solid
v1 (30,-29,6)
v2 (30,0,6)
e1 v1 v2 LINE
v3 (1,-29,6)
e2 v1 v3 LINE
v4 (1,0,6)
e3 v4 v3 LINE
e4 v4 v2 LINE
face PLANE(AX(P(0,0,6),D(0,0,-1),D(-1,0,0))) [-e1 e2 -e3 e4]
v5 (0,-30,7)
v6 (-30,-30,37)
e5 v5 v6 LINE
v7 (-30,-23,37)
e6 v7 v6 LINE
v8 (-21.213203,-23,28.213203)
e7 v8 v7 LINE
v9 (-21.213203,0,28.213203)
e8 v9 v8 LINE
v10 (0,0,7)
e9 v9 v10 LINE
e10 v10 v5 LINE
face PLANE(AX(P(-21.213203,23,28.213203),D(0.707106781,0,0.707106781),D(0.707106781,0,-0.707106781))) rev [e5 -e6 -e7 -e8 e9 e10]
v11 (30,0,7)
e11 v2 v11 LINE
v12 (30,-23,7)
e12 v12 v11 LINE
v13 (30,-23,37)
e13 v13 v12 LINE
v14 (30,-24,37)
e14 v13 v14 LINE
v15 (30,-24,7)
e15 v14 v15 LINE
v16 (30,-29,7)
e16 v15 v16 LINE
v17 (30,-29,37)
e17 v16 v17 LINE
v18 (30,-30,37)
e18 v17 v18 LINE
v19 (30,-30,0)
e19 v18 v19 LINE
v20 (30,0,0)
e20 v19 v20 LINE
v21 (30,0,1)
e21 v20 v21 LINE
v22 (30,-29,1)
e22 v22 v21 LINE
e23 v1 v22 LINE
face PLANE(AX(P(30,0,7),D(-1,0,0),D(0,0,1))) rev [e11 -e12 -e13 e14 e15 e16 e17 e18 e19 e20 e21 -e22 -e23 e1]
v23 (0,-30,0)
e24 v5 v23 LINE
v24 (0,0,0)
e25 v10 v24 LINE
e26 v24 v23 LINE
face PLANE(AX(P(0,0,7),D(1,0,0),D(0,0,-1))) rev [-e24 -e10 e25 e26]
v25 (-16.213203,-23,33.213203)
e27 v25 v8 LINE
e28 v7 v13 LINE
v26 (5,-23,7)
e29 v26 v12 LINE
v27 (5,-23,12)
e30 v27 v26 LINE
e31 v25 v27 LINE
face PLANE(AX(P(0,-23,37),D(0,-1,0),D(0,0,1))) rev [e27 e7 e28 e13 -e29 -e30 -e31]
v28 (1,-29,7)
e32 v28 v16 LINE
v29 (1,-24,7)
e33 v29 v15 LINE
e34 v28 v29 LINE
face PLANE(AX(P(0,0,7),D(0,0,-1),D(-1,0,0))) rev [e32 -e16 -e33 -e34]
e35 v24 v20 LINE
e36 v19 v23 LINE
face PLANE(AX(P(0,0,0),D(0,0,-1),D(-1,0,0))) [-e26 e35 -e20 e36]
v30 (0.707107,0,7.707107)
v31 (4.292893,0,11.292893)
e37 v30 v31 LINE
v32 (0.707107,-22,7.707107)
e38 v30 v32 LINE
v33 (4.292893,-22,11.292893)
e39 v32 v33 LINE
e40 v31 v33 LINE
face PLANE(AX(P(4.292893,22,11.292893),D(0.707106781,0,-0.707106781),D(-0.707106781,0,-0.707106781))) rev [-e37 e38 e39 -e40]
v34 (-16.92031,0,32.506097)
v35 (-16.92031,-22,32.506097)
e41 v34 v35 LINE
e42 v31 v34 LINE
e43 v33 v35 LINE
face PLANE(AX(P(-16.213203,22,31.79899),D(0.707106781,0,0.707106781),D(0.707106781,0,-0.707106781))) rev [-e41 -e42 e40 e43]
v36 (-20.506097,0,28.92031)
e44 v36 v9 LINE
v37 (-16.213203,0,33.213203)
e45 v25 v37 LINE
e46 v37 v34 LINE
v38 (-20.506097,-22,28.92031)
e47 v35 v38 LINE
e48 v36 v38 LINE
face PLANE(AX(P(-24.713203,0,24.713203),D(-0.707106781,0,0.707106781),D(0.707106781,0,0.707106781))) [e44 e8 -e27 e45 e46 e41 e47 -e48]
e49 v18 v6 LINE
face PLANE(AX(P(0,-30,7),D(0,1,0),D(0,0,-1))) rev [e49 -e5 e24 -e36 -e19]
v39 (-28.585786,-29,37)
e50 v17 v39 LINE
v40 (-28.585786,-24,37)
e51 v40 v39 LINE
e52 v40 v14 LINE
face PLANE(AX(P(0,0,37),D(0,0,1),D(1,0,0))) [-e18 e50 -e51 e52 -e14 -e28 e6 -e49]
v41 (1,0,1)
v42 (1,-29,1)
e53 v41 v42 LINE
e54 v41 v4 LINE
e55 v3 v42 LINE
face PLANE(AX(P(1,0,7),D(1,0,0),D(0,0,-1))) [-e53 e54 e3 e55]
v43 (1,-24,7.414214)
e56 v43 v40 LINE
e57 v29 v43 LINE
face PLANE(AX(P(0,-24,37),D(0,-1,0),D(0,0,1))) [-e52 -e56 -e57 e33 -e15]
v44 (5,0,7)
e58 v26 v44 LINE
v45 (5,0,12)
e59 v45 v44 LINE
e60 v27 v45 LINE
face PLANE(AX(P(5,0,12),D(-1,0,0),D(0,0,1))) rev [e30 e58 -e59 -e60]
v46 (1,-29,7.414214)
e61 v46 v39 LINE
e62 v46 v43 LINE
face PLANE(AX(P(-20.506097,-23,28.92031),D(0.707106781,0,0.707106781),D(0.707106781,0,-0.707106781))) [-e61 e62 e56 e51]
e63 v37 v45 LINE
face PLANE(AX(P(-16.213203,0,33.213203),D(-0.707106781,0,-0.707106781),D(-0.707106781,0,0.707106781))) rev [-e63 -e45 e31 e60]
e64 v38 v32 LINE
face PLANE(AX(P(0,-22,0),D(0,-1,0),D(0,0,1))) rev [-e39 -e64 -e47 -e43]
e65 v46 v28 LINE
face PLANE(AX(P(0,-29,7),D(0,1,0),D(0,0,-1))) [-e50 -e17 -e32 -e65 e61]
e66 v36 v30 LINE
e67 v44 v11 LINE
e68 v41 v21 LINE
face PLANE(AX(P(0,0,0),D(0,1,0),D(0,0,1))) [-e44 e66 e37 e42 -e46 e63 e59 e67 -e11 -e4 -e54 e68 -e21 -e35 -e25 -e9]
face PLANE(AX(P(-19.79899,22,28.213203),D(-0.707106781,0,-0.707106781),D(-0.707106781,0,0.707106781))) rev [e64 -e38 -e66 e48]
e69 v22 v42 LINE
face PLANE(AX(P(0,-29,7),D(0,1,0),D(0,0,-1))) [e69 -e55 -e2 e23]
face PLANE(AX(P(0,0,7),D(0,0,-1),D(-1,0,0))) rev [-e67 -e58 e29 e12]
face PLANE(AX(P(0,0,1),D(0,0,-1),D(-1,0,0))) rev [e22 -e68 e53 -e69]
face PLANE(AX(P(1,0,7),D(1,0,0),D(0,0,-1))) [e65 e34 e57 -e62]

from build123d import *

# Parameters (mm, degrees)
SKETCH1_W           = 30
SKETCH1_H           = 30
BOSS_EXTRUDE1_DEPTH = 7
SHELL1_T            = -1
SKETCH2_W           = 30
SKETCH2_H           = 7
BOSS_EXTRUDE2_DEPTH = 30
SKETCH3_W           = 30
SKETCH3_H           = 7
BOSS_EXTRUDE3_DEPTH = 30
SKETCH5_W           = 5
SKETCH5_H           = 23
BOSS_EXTRUDE4_DEPTH = 5
CUT_EXTRUDE6_DEPTH  = 23
SKETCH12_W          = 7.071067812
SKETCH12_H          = 23
BOSS_EXTRUDE6_DEPTH = 30
CUT_EXTRUDE7_DEPTH  = 22
CUT_EXTRUDE8_DEPTH  = 22
SHELL2_START        = 24
SHELL2_DEPTH        = 5
SHELL2_START_2      = 23
SHELL2_2_DEPTH      = 1
SHELL2_START_3      = 1
SHELL2_3_DEPTH      = 22
BOSS_EXTRUDE7_DEPTH = 1
BOSS_EXTRUDE8_DEPTH = 23
CUT_EXTRUDE10_DEPTH = 1
CUT_EXTRUDE12_START = -30
CUT_EXTRUDE12_DEPTH = 50


# Read off the part's stored shape, not the designer's step: Shell2
with BuildPart() as part:
    # Sketch1 → Boss-Extrude1 (new body)
    with BuildSketch(Plane.XY):
        with Locations((15, 15)):
            Rectangle(SKETCH1_W, SKETCH1_H)
    extrude(amount=BOSS_EXTRUDE1_DEPTH)

    # Shell1
    shell1_openings = [part.faces().sort_by_distance(p)[0] for p in [
        (30, 15, 3.5),
        (15, 0, 3.5),
    ]]
    offset(amount=SHELL1_T, openings=shell1_openings, kind=Kind.INTERSECTION)

    # Sketch2 → Boss-Extrude2 (add)
    with BuildSketch(Plane.XY.offset(7)):
        with Locations((15, 26.5)):
            Rectangle(SKETCH2_W, SKETCH2_H)
    extrude(amount=BOSS_EXTRUDE2_DEPTH)

    # Sketch3 → Boss-Extrude3 (add)
    with BuildSketch(Plane.ZY):
        with Locations((22, 26.5)):
            Rectangle(SKETCH3_W, SKETCH3_H)
    extrude(amount=BOSS_EXTRUDE3_DEPTH)

    # Sketch5 → Boss-Extrude4 (add)
    with BuildSketch(Plane.XY.offset(7)):
        with Locations((2.5, 11.5)):
            Rectangle(SKETCH5_W, SKETCH5_H)
    extrude(amount=BOSS_EXTRUDE4_DEPTH)

    # Sketch6 → Cut-Extrude6 (cut)
    with BuildSketch(Plane.XZ):
        Polygon((0, 12), (5, 12), (0, 7), align=None)
    extrude(amount=-CUT_EXTRUDE6_DEPTH, mode=Mode.SUBTRACT)

    # Sketch12 → Boss-Extrude6 (add)
    with BuildSketch(Plane(origin=(-3.5, 0, 3.5), x_dir=(0.7071067811865475, 0, 0.7071067811865477), z_dir=(-0.7071067811865477, 0, 0.7071067811865475))):
        with Locations((8.485281374, 11.5)):
            Rectangle(SKETCH12_W, SKETCH12_H)
    extrude(amount=BOSS_EXTRUDE6_DEPTH)

    # Sketch13 → Cut-Extrude7 (cut)
    with BuildSketch(Plane.XZ):
        Polygon((-19.798989873, 28.213203436), (0.707106781, 7.707106781), (4.292893219, 11.292893219), (-16.213203436, 31.798989873), (-16.920310217, 32.506096654), (-20.506096654, 28.920310217), align=None)
    extrude(amount=-CUT_EXTRUDE7_DEPTH, mode=Mode.SUBTRACT)

    # Sketch4 → Cut-Extrude8 (cut)
    with BuildSketch(Plane.XZ.offset(-23)):
        Polygon((-30, 37), (0, 7), (-30, 7), align=None)
    extrude(amount=-CUT_EXTRUDE8_DEPTH, mode=Mode.SUBTRACT)

    # Shell2 outline → Shell2 (cut)
    with BuildSketch(Plane(origin=(0, 0, 0), x_dir=(1, 0, 0), z_dir=(0, 1, 0)).offset(SHELL2_START)):
        Polygon((29, -37), (29, -7), (1, -7), (1, -7.414213562), (-28.585786438, -37), align=None)
    extrude(amount=SHELL2_DEPTH, mode=Mode.SUBTRACT)

    # Shell2 2 outline → Shell2 2 (cut)
    with BuildSketch(Plane(origin=(0, 0, 0), x_dir=(1, 0, 0), z_dir=(0, 1, 0)).offset(SHELL2_START_2)):
        Polygon((4, -7), (1, -7), (1, -7.414213562), (-19.798989873, -28.213203435), (-16.213203436, -31.798989873), (4, -11.585786438), align=None)
    extrude(amount=SHELL2_2_DEPTH, mode=Mode.SUBTRACT)

    # Shell2 3 outline → Shell2 3 (cut)
    with BuildSketch(Plane(origin=(0, 0, 0), x_dir=(1, 0, 0), z_dir=(0, 1, 0)).offset(SHELL2_START_3)):
        Polygon((4, -9.585786438), (4, -7), (1.414213562, -7), align=None)
    extrude(amount=SHELL2_3_DEPTH, mode=Mode.SUBTRACT)

    # Sketch16 → Boss-Extrude7 (add)
    with BuildSketch(Plane(origin=(0, 23, 0), x_dir=(1, 0, 0), z_dir=(0, 1, 0))):
        Polygon((1.414213562, -7), (1, -7), (1, -7.414213562), (-19.798989873, -28.213203436), (-16.213203436, -31.798989873), (4, -11.585786438), (4, -9.585786438), align=None)
    extrude(amount=BOSS_EXTRUDE7_DEPTH)

    # Sketch18 → Boss-Extrude8 (add)
    with BuildSketch(Plane(origin=(0, 1, 0), x_dir=(1, 0, 0), z_dir=(0, 1, 0))):
        Polygon((4, -9.585786438), (4, -7), (1.414213562, -7), align=None)
    extrude(amount=BOSS_EXTRUDE8_DEPTH)

    # Sketch19 → Cut-Extrude10 (cut)
    with BuildSketch(Plane(origin=(30, 0, 0), x_dir=(0, 0, -1), z_dir=(1, 0, 0))):
        Polygon((-36, 29), (-37, 29), (-37, 24), (-36, 24), (-7, 24), (-7, 29), align=None)
    extrude(amount=-CUT_EXTRUDE10_DEPTH, mode=Mode.SUBTRACT)

    # Mirror4: part across plane


with BuildPart() as part_1:
    add(part.part)
    add(part.part.mirror(Plane(origin=(0, 0, 7), x_dir=(0, 0, 1), z_dir=(0, 1, 0))))

    # Sketch20 → Cut-Extrude12 (cut)
    with BuildSketch(Plane.XZ.offset(30).offset(CUT_EXTRUDE12_START)):
        Polygon((0, 7), (0, 0), (30, 0), (30, 37), (-30, 37), align=None)
    extrude(amount=-CUT_EXTRUDE12_DEPTH, mode=Mode.SUBTRACT)


solid = part_1.part
